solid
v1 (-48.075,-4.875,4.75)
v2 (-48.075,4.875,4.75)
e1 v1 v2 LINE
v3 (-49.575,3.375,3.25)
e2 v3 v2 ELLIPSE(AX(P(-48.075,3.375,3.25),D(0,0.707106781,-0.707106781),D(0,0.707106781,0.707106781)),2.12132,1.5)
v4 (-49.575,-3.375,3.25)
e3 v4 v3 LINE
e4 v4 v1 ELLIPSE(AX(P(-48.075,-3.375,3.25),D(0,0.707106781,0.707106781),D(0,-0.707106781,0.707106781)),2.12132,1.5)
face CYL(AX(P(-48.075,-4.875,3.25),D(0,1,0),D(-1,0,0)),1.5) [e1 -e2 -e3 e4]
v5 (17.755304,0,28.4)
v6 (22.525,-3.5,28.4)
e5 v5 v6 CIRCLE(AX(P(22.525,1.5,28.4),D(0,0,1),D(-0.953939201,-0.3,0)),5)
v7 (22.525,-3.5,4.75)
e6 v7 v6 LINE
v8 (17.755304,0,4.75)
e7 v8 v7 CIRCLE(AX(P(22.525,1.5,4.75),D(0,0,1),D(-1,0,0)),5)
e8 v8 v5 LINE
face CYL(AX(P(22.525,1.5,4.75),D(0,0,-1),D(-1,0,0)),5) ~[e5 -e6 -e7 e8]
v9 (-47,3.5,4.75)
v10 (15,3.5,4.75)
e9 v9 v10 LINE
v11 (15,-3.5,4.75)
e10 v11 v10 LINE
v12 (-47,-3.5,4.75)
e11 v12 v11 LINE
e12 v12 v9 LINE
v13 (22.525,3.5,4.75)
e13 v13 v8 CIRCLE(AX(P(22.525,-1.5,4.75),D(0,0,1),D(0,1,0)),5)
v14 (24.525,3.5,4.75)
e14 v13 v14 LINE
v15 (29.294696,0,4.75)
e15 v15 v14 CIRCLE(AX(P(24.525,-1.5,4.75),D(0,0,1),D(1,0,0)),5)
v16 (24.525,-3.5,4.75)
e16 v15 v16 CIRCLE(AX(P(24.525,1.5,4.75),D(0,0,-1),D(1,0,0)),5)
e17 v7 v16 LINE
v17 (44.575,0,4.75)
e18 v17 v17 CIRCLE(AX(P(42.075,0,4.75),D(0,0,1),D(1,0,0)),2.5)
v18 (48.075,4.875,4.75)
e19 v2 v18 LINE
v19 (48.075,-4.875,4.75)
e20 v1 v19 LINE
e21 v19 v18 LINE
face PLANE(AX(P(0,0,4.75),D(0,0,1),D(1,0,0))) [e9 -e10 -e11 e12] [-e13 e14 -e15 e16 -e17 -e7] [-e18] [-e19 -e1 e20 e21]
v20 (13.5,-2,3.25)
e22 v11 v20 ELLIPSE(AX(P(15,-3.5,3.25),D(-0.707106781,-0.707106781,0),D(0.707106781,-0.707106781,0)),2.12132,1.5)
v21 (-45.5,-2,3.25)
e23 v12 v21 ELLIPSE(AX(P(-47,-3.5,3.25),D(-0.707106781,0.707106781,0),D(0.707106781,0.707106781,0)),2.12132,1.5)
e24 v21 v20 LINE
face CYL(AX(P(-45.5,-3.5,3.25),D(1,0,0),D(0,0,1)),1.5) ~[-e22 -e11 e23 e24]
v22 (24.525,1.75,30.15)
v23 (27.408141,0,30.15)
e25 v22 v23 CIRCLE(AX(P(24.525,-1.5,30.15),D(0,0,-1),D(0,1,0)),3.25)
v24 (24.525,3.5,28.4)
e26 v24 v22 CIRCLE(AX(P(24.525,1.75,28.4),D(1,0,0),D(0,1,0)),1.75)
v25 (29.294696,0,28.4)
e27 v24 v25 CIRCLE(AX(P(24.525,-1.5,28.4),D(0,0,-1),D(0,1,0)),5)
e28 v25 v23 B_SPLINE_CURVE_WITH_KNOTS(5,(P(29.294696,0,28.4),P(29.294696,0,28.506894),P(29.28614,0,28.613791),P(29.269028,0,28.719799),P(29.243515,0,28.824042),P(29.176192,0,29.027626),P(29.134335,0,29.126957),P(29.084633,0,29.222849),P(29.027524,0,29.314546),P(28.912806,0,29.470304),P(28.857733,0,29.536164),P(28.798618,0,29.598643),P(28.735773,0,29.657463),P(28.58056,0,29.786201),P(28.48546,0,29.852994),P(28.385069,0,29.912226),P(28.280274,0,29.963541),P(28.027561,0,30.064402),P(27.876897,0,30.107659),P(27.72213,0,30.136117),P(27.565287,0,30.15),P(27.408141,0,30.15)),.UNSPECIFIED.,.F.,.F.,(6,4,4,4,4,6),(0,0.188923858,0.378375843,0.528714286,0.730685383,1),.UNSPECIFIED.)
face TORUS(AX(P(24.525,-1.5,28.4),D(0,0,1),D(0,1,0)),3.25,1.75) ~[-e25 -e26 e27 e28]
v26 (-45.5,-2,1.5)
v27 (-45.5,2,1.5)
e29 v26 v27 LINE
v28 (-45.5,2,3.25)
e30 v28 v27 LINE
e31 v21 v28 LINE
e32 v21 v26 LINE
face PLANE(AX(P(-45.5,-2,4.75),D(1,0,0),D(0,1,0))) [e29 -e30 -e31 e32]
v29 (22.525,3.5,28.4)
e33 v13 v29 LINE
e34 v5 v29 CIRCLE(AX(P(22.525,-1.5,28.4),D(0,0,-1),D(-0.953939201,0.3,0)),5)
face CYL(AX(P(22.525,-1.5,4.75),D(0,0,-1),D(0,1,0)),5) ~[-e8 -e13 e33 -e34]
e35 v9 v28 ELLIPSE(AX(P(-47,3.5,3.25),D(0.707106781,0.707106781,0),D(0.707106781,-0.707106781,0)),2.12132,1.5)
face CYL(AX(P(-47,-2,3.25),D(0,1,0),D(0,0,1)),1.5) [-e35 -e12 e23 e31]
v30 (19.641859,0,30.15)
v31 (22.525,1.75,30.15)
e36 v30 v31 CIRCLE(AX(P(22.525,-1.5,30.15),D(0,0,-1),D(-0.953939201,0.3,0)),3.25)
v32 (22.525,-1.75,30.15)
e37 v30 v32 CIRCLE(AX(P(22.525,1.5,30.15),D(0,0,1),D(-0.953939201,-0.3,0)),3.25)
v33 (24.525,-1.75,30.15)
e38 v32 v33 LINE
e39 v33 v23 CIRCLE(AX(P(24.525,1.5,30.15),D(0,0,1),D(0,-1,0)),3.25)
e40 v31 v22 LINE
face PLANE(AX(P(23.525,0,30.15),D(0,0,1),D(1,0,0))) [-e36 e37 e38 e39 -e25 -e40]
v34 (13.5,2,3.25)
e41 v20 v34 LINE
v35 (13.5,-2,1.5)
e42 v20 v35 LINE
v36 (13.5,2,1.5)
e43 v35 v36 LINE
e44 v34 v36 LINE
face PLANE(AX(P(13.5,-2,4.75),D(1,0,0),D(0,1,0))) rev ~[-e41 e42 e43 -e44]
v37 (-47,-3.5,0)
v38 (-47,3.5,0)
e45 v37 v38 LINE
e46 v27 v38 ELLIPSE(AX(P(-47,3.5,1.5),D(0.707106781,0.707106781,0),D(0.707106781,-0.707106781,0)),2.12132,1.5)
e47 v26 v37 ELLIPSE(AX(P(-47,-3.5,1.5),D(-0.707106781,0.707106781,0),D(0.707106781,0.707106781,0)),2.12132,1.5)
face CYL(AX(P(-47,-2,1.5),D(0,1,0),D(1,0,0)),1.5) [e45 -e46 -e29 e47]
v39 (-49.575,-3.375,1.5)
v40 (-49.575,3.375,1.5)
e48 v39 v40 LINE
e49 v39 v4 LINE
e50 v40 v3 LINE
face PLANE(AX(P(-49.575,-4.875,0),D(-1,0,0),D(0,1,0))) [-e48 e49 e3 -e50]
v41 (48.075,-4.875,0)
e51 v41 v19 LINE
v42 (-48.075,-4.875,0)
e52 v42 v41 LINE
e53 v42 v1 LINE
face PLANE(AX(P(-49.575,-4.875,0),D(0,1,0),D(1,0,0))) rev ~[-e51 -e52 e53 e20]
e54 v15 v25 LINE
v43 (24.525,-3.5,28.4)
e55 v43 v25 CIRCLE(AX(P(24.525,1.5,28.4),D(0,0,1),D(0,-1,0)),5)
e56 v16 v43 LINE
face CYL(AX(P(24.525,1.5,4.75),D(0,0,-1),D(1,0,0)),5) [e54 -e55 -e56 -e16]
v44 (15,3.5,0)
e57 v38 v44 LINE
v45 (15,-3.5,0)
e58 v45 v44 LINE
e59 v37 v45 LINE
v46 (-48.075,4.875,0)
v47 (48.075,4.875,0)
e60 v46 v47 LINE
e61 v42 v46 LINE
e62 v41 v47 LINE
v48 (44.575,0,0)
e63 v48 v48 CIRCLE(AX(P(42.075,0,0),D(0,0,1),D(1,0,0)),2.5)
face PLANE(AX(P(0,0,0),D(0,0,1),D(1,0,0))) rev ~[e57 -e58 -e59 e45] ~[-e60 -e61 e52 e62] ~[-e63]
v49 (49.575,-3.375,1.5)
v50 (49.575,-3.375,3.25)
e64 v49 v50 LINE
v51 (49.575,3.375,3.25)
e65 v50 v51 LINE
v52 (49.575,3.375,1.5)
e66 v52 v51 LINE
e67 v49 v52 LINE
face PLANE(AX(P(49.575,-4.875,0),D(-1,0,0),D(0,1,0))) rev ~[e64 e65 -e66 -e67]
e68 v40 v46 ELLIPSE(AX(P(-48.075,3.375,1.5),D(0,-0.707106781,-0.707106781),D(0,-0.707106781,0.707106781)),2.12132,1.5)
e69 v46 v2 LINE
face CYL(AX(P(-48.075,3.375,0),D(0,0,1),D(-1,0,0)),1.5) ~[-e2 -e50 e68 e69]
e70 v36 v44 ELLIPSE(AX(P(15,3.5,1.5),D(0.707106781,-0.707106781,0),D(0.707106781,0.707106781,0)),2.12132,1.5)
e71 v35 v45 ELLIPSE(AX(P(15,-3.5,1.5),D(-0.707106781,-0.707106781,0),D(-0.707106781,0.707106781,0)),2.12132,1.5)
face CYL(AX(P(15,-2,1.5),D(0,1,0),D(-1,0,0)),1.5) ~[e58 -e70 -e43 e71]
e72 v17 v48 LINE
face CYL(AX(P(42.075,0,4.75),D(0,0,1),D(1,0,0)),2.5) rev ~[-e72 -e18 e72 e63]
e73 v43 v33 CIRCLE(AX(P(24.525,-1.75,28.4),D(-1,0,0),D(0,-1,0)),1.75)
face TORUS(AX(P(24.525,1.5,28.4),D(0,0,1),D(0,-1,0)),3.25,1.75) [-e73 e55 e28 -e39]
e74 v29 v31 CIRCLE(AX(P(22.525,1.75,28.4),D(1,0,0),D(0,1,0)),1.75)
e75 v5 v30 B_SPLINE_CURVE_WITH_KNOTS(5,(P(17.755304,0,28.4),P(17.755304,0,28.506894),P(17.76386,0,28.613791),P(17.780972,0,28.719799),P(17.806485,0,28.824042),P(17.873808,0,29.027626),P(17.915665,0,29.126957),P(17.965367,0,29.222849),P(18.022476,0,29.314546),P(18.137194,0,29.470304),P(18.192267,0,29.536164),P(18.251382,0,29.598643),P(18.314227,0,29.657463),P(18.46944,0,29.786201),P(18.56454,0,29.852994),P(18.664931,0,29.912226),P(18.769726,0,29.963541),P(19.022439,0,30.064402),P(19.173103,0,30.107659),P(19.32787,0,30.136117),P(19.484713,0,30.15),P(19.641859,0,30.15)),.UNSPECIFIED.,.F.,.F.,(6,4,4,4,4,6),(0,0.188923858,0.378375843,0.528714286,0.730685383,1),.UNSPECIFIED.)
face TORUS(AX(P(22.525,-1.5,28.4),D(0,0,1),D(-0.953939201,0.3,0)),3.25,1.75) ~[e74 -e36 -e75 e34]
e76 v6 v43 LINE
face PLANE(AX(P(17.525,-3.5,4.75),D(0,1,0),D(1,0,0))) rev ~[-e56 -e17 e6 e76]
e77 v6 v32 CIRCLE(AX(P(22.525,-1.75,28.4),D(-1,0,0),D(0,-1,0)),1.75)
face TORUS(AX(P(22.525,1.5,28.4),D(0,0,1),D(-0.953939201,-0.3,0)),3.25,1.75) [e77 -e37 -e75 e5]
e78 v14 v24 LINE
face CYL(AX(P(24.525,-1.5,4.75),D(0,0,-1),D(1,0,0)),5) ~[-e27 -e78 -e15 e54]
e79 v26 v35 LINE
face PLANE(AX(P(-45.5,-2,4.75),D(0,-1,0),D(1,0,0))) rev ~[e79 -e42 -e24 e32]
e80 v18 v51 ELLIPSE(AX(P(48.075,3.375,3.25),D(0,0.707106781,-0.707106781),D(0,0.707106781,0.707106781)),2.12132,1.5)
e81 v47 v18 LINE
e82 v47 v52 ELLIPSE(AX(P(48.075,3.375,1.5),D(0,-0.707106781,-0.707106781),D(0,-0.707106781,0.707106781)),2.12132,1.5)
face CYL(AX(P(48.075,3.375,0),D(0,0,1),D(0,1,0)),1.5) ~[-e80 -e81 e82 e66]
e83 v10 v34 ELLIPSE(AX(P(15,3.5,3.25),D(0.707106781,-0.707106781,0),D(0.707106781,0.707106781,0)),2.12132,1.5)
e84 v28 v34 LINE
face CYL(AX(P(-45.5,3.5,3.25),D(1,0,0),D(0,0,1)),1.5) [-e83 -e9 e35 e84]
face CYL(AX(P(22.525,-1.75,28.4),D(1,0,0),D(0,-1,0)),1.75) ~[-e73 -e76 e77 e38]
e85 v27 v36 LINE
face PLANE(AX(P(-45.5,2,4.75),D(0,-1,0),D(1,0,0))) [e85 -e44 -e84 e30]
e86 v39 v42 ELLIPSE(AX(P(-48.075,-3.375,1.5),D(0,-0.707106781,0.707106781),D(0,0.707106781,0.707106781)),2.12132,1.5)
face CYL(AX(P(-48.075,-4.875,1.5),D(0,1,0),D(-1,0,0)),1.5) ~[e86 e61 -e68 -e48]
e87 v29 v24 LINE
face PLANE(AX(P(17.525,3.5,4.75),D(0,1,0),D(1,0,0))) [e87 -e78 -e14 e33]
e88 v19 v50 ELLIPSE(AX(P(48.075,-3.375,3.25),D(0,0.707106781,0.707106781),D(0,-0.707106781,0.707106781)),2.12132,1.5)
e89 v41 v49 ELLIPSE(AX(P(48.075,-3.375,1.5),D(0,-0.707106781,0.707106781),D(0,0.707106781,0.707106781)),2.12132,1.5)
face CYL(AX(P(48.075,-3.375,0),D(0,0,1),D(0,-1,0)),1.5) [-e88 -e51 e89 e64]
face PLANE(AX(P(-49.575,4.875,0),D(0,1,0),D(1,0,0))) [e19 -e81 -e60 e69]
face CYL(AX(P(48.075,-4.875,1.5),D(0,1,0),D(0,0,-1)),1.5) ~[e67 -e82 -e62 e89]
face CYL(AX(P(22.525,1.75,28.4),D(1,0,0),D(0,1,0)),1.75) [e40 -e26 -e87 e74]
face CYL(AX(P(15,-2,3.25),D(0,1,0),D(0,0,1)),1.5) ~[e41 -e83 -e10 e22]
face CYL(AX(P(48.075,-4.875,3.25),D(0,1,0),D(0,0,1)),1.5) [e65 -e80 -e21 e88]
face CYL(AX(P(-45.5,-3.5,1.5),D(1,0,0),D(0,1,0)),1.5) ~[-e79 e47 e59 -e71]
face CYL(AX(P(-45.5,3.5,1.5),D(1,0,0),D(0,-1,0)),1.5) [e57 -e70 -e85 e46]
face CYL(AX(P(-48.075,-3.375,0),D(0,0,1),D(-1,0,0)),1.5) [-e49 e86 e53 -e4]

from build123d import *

# Parameters (mm, degrees)
F0_W        = 99.15
F0_H        = 9.75
F1_DEPTH    = 4.75
F2_R        = 2.5
F3_DEPTH    = 4.751
F4_W        = 12
F4_H        = 7
F5_DEPTH    = 25.4
F6_T1_DEPTH = 37.9
F7_R        = 1.5
F8_R        = 1.75
F9_W        = 59
F9_H        = 4
F10_DEPTH   = 25
F11_R       = 1.5


# Not quite as in the source:
# - a fillet or chamfer that OpenCascade refuses, or shapes differently, is made with other operations: its cross-section is extruded or revolved along the edge and cut away or added


with BuildPart() as f1:
    # F0 (on Top) → F1 (new body)
    with BuildSketch(Plane.XY):
        Rectangle(F0_W, F0_H)
    extrude(amount=F1_DEPTH)

    # F2 (on face) → F3 (cut, through all)
    with BuildSketch(Plane.XY.offset(4.75)):
        with Locations((42.075, 0)):
            Circle(F2_R)
    extrude(amount=-F3_DEPTH, mode=Mode.SUBTRACT)

    # F4 (on face) → F5 (join)
    with BuildSketch(Plane.XY.offset(4.75)):
        with Locations((23.525, 0)):
            Rectangle(F4_W, F4_H)
    extrude(amount=F5_DEPTH)

    # F6: fillet of radius 5 on 4 edges, made by hand

    # F6_s2 → F6_t1 (cut)
    with BuildSketch(Plane.XY.offset(4.75)):
        with BuildLine():
            ThreePointArc((22.525, 3.5), (18.9894660941, 2.0355339059), (17.525, -1.5))
            Line((17.525, -1.5), (17.525, 3.5))
            Line((17.525, 3.5), (22.525, 3.5))
        make_face()
        with BuildLine():
            ThreePointArc((17.525, 1.5), (18.9894660941, -2.0355339059), (22.525, -3.5))
            Line((22.525, -3.5), (17.525, -3.5))
            Line((17.525, -3.5), (17.525, 1.5))
        make_face()
        with BuildLine():
            ThreePointArc((29.525, -1.5), (28.0605339059, 2.0355339059), (24.525, 3.5))
            Line((24.525, 3.5), (29.525, 3.5))
            Line((29.525, 3.5), (29.525, -1.5))
        make_face()
        with BuildLine():
            ThreePointArc((29.525, 1.5), (28.0605339059, -2.0355339059), (24.525, -3.5))
            Line((24.525, -3.5), (29.525, -3.5))
            Line((29.525, -3.5), (29.525, 1.5))
        make_face()
    extrude(amount=F6_T1_DEPTH, mode=Mode.SUBTRACT)

    # F7
    f7_edges = [f1.edges().sort_by_distance(p)[0] for p in [
        (-49.575, 4.875, 2.375),
        (-49.575, -4.875, 2.375),
        (-49.575, 0, 0),
        (-49.575, 0, 4.75),
        (49.575, -4.875, 2.375),
        (49.575, 4.875, 2.375),
        (49.575, 0, 0),
        (49.575, 0, 4.75),
    ]]
    fillet(f7_edges, radius=F7_R)

    # F8
    f8_edges = [f1.edges().sort_by_distance(p)[0] for p in [
        (23.525, -3.5, 30.15),
        (19.56696, -2.531129, 30.15),
        (19.56696, 2.531129, 30.15),
        (23.525, 3.5, 30.15),
        (27.48304, 2.531129, 30.15),
        (27.48304, -2.531129, 30.15),
    ]]
    fillet(f8_edges, radius=F8_R)

    # F9 (on face) → F10 (cut)
    with BuildSketch(Plane.XY.offset(4.75)):
        with Locations((-16, 0)):
            Rectangle(F9_W, F9_H)
    extrude(amount=-F10_DEPTH, mode=Mode.SUBTRACT)

    # F11
    f11_edges = [f1.edges().sort_by_distance(p)[0] for p in [
        (-16, 2, 4.75),
        (-45.5, 0, 4.75),
        (-16, -2, 4.75),
        (13.5, 0, 4.75),
        (13.5, 0, 0),
        (-16, 2, 0),
        (-16, -2, 0),
        (-45.5, 0, 0),
    ]]
    fillet(f11_edges, radius=F11_R)


solid = f1.part
